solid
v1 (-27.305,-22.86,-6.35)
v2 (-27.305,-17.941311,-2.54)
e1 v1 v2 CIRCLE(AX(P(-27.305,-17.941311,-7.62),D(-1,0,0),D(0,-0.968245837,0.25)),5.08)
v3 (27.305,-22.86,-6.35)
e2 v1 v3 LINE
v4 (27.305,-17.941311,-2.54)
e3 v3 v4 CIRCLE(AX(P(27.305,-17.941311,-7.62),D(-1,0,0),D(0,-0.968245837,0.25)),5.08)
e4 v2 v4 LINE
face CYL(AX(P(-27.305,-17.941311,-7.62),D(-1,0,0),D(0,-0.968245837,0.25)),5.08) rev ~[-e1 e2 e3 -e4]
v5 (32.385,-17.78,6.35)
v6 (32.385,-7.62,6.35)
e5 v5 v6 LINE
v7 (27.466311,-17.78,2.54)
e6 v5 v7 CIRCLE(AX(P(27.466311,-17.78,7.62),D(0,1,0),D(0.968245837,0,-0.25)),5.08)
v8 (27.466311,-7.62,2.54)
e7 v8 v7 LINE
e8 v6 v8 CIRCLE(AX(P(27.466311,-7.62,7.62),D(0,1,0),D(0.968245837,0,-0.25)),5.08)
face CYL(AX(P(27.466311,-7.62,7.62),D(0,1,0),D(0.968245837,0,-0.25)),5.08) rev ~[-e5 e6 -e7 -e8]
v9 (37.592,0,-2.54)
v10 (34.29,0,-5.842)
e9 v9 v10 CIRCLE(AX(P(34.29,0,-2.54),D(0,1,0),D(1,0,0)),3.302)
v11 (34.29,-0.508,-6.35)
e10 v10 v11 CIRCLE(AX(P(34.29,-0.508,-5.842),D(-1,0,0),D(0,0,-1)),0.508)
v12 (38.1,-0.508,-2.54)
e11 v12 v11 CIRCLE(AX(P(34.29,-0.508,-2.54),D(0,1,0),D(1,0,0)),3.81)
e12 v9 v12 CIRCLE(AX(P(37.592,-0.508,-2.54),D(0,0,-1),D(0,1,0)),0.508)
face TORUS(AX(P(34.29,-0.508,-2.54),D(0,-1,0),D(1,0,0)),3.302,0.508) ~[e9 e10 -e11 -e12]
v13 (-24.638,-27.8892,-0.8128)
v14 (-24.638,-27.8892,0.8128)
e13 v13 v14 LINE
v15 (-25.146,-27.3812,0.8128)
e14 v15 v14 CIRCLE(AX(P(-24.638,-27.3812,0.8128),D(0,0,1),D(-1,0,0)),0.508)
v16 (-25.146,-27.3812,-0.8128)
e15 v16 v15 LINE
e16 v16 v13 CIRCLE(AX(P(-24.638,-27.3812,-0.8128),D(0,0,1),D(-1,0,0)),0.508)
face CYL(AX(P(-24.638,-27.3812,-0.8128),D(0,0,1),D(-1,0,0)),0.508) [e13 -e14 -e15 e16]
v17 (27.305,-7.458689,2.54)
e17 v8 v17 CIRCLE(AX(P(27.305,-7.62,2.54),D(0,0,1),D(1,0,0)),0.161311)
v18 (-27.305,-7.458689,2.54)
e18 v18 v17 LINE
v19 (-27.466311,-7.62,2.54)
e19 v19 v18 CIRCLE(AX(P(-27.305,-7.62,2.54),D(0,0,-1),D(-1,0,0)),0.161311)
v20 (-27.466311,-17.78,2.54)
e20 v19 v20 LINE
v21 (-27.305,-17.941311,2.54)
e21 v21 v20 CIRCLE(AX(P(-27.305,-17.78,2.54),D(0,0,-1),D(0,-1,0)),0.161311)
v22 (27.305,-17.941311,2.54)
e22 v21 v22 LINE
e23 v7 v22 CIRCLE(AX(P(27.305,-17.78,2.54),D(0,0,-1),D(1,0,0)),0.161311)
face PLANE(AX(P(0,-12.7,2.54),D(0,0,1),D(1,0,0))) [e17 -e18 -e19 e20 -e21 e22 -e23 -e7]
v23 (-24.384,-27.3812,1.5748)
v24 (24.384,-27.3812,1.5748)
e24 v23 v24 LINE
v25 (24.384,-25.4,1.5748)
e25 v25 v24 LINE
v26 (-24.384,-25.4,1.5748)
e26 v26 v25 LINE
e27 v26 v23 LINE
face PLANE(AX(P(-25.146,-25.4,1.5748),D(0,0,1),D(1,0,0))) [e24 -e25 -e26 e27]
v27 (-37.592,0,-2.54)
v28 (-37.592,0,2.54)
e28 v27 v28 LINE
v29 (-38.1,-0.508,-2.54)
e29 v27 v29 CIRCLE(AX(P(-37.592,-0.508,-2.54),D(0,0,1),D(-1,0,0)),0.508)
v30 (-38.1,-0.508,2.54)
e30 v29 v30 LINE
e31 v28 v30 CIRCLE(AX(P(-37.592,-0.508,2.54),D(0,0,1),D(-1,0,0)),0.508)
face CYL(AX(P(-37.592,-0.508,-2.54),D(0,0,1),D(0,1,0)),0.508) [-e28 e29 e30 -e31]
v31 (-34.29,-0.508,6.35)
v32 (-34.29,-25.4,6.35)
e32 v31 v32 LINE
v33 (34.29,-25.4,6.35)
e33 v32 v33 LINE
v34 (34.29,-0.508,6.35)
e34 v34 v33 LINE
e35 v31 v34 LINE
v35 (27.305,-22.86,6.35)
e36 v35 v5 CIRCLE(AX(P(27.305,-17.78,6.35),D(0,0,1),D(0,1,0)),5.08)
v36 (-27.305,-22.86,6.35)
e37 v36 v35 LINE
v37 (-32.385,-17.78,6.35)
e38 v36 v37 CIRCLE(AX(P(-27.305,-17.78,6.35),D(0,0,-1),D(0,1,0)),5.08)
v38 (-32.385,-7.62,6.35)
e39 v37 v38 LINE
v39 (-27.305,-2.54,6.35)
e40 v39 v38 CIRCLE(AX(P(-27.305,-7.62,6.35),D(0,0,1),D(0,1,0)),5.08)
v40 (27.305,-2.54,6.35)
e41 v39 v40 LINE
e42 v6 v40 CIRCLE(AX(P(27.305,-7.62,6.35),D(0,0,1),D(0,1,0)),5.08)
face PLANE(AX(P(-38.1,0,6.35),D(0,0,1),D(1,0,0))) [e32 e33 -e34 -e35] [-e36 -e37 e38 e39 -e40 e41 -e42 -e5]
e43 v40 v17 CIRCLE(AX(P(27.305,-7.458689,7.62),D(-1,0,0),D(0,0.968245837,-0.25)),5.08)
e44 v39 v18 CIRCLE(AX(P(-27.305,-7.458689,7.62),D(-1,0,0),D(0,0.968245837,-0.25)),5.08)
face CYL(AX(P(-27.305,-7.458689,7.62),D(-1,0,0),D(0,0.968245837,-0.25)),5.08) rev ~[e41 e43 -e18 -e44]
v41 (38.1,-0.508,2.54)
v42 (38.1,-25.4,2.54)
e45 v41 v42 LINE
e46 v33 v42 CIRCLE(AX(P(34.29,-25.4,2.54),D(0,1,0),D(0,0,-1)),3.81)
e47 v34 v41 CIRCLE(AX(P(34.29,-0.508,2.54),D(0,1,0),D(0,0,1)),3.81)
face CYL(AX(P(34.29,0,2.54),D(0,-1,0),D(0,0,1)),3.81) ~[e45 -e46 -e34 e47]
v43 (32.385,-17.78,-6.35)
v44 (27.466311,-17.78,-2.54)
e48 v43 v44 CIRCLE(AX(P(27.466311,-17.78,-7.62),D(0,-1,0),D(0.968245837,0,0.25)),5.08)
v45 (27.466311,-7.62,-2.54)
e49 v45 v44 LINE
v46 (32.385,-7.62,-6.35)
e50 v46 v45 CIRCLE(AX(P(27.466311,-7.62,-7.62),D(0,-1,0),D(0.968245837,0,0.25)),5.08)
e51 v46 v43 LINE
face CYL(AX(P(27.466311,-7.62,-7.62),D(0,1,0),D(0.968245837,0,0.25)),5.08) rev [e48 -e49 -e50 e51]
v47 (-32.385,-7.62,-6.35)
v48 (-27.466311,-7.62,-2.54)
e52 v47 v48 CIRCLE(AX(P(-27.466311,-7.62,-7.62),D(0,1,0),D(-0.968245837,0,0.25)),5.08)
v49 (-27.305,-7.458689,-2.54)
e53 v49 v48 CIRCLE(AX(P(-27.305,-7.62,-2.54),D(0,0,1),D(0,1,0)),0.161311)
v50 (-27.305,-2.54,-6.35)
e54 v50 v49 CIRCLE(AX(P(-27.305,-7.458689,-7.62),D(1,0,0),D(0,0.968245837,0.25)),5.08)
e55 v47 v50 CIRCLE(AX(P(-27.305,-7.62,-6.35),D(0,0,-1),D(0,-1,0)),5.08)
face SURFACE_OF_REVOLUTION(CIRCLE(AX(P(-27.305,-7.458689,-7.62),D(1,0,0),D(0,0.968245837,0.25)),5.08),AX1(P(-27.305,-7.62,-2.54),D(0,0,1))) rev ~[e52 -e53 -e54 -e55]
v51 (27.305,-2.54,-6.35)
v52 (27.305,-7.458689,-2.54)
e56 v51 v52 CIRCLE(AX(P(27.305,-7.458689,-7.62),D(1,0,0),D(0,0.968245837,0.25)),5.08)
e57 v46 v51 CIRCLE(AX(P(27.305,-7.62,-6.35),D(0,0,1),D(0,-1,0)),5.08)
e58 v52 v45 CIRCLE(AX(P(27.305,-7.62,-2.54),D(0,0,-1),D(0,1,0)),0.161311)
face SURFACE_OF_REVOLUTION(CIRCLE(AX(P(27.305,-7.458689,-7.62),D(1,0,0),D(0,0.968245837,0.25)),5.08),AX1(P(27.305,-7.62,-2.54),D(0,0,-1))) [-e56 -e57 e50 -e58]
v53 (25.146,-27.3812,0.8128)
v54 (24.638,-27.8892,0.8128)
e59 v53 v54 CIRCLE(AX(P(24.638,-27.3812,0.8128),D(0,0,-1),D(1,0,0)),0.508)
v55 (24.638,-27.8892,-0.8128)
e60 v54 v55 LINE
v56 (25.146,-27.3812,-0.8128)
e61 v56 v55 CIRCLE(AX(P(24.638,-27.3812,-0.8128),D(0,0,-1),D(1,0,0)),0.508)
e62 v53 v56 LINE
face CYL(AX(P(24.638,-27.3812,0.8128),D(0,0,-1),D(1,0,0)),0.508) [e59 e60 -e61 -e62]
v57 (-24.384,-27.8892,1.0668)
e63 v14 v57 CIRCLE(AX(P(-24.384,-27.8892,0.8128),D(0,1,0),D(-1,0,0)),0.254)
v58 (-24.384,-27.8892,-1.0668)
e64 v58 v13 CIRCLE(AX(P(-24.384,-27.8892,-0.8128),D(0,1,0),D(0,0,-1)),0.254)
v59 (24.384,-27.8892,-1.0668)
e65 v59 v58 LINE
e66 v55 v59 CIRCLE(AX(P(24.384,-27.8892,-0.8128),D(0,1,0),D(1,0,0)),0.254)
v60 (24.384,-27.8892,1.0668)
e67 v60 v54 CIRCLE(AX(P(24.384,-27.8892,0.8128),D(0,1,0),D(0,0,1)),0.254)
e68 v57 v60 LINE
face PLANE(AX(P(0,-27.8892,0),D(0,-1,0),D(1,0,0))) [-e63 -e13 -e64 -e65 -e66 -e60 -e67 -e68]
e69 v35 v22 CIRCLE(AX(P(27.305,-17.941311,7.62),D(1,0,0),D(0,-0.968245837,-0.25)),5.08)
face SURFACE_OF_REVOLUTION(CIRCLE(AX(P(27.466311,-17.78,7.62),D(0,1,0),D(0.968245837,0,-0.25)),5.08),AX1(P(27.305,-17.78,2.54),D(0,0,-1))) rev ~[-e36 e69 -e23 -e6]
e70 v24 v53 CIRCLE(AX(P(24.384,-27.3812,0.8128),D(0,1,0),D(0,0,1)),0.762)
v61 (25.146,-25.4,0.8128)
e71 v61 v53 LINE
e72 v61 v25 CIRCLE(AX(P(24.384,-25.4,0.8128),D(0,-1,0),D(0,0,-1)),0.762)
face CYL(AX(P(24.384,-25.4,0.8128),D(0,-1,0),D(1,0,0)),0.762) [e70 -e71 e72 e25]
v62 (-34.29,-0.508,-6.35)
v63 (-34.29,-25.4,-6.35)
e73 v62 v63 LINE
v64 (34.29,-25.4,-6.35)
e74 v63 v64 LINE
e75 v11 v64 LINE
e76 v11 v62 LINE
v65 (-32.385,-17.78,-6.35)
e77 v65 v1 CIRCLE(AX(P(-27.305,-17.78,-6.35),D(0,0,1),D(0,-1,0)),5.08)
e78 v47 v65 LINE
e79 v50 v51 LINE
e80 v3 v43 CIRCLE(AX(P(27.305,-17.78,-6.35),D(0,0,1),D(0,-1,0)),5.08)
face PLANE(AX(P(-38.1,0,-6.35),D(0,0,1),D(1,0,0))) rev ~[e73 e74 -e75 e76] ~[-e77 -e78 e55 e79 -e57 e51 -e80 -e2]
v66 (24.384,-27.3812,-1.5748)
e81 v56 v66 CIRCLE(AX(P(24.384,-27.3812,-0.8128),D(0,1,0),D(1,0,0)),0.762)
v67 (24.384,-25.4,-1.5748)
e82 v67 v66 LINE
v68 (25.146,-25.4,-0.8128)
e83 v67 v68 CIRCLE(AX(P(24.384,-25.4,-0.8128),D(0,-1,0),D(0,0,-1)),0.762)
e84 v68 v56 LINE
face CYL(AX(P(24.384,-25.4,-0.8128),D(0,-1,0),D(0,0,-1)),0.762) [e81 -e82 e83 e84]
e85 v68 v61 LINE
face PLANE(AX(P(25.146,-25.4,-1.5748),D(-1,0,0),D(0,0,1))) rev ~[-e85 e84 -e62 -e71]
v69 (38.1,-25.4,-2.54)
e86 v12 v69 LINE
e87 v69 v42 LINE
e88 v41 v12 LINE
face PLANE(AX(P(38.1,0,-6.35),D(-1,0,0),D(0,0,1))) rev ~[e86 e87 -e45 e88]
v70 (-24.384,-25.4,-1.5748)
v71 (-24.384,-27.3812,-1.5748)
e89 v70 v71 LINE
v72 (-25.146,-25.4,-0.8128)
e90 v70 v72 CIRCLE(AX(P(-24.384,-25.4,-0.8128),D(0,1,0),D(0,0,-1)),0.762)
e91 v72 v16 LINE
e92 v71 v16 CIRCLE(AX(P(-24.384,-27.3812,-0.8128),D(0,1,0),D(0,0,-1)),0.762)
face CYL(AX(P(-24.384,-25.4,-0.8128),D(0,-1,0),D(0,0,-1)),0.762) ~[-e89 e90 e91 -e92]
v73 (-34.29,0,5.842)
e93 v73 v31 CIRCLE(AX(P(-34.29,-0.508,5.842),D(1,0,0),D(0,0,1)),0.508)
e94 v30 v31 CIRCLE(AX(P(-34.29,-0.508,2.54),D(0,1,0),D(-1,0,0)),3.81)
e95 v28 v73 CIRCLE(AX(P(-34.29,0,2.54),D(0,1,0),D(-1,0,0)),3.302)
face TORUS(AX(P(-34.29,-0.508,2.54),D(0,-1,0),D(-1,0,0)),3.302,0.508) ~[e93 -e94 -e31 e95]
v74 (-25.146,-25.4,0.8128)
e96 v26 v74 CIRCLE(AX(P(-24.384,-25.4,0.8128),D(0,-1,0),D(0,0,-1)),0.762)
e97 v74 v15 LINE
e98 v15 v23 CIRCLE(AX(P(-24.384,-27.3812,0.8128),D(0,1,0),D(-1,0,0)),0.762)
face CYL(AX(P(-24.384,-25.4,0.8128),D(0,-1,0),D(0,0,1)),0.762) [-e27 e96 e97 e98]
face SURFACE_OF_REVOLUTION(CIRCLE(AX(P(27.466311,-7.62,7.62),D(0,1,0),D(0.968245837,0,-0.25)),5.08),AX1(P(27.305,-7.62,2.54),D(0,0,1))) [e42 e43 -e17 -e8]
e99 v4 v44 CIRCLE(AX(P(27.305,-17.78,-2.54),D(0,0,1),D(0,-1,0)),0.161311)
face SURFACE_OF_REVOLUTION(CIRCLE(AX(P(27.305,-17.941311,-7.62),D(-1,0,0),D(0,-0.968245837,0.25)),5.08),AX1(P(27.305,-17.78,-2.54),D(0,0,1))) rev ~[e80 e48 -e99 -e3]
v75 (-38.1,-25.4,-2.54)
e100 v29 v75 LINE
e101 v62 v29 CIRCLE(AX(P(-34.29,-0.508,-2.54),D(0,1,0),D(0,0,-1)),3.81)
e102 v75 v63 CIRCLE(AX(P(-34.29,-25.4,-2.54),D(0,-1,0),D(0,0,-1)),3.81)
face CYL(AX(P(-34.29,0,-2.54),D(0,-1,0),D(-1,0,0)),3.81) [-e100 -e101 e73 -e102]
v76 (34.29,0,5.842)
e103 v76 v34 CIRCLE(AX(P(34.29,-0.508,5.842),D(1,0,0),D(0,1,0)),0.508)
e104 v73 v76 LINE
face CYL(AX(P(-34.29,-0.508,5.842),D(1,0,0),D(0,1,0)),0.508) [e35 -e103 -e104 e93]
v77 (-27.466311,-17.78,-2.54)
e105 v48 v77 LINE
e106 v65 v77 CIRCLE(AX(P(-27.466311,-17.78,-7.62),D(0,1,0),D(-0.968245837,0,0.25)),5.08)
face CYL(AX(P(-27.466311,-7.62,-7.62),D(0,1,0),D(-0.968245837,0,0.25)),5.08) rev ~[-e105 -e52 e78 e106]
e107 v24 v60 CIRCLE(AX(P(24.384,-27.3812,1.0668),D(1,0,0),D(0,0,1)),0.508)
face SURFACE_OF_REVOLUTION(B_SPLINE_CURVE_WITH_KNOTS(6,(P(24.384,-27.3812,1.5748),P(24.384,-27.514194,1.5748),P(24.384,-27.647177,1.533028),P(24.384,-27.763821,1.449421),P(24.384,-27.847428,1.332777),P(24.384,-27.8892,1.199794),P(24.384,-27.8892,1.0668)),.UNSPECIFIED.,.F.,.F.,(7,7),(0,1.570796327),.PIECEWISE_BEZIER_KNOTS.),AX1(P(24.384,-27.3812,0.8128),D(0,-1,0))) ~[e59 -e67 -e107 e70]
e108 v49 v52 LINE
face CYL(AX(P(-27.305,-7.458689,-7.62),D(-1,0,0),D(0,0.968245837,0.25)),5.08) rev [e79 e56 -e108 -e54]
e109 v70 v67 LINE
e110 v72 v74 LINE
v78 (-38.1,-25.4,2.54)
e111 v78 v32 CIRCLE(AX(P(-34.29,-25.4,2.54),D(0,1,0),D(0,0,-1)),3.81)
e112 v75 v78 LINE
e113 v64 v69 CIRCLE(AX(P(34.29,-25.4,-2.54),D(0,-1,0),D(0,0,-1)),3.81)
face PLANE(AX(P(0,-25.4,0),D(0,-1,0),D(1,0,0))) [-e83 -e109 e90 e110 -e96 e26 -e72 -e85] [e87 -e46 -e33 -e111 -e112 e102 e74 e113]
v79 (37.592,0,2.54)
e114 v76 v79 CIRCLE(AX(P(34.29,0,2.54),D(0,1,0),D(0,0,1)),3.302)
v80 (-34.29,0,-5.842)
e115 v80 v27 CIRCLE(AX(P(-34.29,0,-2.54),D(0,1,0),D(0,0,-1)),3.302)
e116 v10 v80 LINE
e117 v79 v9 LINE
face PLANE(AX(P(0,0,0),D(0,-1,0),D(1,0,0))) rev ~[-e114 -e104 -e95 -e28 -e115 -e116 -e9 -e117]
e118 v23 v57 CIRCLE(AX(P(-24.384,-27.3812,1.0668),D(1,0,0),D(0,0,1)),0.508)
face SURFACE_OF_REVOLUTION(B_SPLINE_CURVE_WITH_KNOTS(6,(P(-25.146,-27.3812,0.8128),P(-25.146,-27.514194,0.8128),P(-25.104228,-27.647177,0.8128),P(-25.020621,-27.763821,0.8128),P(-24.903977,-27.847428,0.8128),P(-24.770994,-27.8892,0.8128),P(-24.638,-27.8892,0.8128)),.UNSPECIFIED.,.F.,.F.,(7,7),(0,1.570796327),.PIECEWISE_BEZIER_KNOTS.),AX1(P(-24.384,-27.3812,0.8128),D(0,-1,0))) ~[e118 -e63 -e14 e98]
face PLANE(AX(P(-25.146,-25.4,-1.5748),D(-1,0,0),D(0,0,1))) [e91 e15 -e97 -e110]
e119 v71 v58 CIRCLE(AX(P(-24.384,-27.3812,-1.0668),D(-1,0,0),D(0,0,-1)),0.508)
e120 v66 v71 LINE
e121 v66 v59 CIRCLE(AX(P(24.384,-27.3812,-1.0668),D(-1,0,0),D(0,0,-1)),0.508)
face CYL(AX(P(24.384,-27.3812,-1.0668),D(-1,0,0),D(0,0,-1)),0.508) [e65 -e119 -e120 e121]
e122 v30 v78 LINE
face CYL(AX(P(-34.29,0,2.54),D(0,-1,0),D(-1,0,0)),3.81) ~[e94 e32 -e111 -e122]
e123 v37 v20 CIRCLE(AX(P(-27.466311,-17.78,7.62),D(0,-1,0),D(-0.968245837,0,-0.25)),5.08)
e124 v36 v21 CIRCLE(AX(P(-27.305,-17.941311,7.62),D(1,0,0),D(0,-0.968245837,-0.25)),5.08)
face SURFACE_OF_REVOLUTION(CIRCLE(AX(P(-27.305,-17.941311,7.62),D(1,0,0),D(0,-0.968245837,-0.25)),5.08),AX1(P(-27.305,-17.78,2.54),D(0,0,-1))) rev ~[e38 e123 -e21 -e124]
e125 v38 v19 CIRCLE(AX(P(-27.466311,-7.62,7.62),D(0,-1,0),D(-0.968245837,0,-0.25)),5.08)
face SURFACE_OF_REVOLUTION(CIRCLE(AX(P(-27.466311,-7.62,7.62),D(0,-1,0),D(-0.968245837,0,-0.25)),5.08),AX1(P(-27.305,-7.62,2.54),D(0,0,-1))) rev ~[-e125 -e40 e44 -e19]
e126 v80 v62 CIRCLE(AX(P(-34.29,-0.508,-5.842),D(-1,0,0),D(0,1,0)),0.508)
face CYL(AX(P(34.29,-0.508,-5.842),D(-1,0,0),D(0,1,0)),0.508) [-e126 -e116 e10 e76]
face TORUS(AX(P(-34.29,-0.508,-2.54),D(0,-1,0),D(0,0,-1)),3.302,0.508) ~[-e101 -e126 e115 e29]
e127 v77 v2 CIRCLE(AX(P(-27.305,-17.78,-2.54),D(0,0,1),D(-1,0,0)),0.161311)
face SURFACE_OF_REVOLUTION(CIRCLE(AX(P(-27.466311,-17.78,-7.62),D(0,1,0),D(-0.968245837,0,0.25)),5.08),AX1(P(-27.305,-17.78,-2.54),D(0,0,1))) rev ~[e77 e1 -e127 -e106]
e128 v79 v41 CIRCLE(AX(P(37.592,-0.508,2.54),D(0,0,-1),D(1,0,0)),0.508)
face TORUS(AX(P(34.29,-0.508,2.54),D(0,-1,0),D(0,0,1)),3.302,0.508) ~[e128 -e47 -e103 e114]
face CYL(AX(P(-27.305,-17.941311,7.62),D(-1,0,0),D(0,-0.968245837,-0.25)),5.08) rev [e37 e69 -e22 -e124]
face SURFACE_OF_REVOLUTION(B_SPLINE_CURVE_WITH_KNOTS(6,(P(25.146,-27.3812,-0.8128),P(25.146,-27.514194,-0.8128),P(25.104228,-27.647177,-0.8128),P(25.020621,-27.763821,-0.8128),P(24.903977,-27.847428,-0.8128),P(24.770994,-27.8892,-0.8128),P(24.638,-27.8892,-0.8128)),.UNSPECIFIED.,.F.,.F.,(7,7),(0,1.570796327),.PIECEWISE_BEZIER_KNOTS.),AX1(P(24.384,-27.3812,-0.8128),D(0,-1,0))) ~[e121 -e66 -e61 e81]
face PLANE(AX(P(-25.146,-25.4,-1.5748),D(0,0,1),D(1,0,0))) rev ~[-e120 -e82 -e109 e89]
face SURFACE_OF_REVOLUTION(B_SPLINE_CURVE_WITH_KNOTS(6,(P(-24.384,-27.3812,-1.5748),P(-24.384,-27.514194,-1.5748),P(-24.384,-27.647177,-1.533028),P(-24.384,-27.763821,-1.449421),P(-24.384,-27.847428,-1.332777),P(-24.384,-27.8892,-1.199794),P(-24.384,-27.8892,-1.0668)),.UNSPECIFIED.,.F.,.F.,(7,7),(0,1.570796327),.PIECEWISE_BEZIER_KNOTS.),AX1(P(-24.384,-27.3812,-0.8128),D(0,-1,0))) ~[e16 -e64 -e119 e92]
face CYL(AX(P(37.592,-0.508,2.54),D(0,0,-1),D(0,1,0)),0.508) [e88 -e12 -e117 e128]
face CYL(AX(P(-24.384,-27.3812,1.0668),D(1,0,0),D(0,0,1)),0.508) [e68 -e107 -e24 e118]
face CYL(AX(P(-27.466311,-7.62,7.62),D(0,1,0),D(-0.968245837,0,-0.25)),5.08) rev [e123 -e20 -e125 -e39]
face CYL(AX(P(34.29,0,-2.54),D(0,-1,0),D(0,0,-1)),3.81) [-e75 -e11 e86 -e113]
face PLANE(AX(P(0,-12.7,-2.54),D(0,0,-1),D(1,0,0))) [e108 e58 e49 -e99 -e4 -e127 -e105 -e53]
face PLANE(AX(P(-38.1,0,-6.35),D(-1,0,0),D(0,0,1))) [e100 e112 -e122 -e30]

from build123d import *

# Parameters (mm, degrees)
F0_W          = 76.2
F0_H          = 12.7
F1_DEPTH      = 25.4
F2_W          = 50.292
F2_H          = 3.1496
F3_DEPTH      = 2.4892
F4_R          = 0.762
F5_R          = 0.508
F6_R          = 3.81
F7_W          = 64.77
F7_H          = 20.32
F8_DEPTH      = 3.81
F9_R          = 5.08
F10_T1_DEPTH  = 54.61
F10_T3_DEPTH  = 10.16
F10_T6_ANGLE  = 90
F10_T8_ANGLE  = 90
F10_T10_ANGLE = 90
F10_T12_ANGLE = 90
F11_W         = 64.77
F11_H         = 20.32
F12_DEPTH     = 3.81
F13_R         = 5.08
F14_T1_DEPTH  = 54.61
F14_T3_DEPTH  = 10.16
F14_T6_ANGLE  = 90
F14_T8_ANGLE  = 90
F14_T10_ANGLE = 90
F14_T12_ANGLE = 90
F15_R         = 0.508


# Not quite as in the source:
# - a fillet or chamfer that OpenCascade refuses, or shapes differently, is made with other operations: its cross-section is extruded or revolved along the edge and cut away or added


with BuildPart() as f1:
    # F0 (on Front) → F1 (new body)
    with BuildSketch(Plane.XZ):
        Rectangle(F0_W, F0_H)
    extrude(amount=F1_DEPTH)

    # F2 (on face) → F3 (join)
    with BuildSketch(Plane.XZ.offset(25.4)):
        Rectangle(F2_W, F2_H)
    extrude(amount=F3_DEPTH)

    # F4
    f4_edges = [f1.edges().sort_by_distance(p)[0] for p in [
        (-25.146, -26.6446, 1.5748),
        (-25.146, -26.6446, -1.5748),
        (25.146, -26.6446, 1.5748),
        (25.146, -26.6446, -1.5748),
    ]]
    fillet(f4_edges, radius=F4_R)

    # F5
    f5_edges = [f1.edges().sort_by_distance(p)[0] for p in [
        (0, -27.8892, 1.5748),
        (24.922815, -27.8892, 1.351615),
        (-24.922815, -27.8892, 1.351615),
        (25.146, -27.8892, 0),
        (-25.146, -27.8892, 0),
        (24.922815, -27.8892, -1.351615),
        (-24.922815, -27.8892, -1.351615),
        (0, -27.8892, -1.5748),
    ]]
    fillet(f5_edges, radius=F5_R)

    # F6
    f6_edges = [f1.edges().sort_by_distance(p)[0] for p in [
        (38.1, -12.7, 6.35),
        (38.1, -12.7, -6.35),
        (-38.1, -12.7, 6.35),
        (-38.1, -12.7, -6.35),
    ]]
    fillet(f6_edges, radius=F6_R)

    # F7 (on face) → F8 (cut)
    with BuildSketch(Plane.XY.offset(6.35)):
        with Locations((0, -12.7)):
            Rectangle(F7_W, F7_H)
    extrude(amount=-F8_DEPTH, mode=Mode.SUBTRACT)

    # F9
    f9_edges = [f1.edges().sort_by_distance(p)[0] for p in [
        (-32.385, -2.54, 4.445),
        (-32.385, -22.86, 4.445),
        (32.385, -2.54, 4.445),
        (32.385, -22.86, 4.445),
    ]]
    fillet(f9_edges, radius=F9_R)

    # F10: fillet of radius 5.08 on 1 edges, made by hand

    # F10_s2 → F10_t1 (join)
    with BuildSketch(Plane.YZ.offset(-27.305)):
        with BuildLine():
            ThreePointArc((-2.54, 6.35), (-4.3478368763, 3.6039073716), (-7.4586888497, 2.54))
            Line((-7.4586888497, 2.54), (-2.54, 2.54))
            Line((-2.54, 2.54), (-2.54, 6.35))
        make_face()
        with BuildLine():
            ThreePointArc((-22.86, 6.35), (-21.0521631237, 3.6039073716), (-17.9413111503, 2.54))
            Line((-17.9413111503, 2.54), (-22.86, 2.54))
            Line((-22.86, 2.54), (-22.86, 6.35))
        make_face()
    extrude(amount=F10_T1_DEPTH)

    # F10_s4 → F10_t3 (join)
    with BuildSketch(Plane.XZ.offset(7.62)):
        with BuildLine():
            ThreePointArc((-32.385, 6.35), (-30.5771631237, 3.6039073716), (-27.4663111503, 2.54))
            Line((-27.4663111503, 2.54), (-32.385, 2.54))
            Line((-32.385, 2.54), (-32.385, 6.35))
        make_face()
        with BuildLine():
            ThreePointArc((32.385, 6.35), (30.5771631237, 3.6039073716), (27.4663111503, 2.54))
            Line((27.4663111503, 2.54), (32.385, 2.54))
            Line((32.385, 2.54), (32.385, 6.35))
        make_face()
    extrude(amount=F10_T3_DEPTH)

    # F10_s5 → F10_t6 (revolve)
    with BuildSketch(Plane.XZ.offset(7.62)):
        with BuildLine():
            ThreePointArc((32.385, 6.35), (30.5771631237, 3.6039073716), (27.4663111503, 2.54))
            Line((27.4663111503, 2.54), (32.385, 2.54))
            Line((32.385, 2.54), (32.385, 6.35))
        make_face()
    revolve(axis=Axis((27.305, -7.62, 2.54), (0, 0, 1)), revolution_arc=F10_T6_ANGLE)

    # F10_s7 → F10_t8 (revolve)
    with BuildSketch(Plane.XZ.offset(7.62)):
        with BuildLine():
            ThreePointArc((-32.385, 6.35), (-30.5771631237, 3.6039073716), (-27.4663111503, 2.54))
            Line((-27.4663111503, 2.54), (-32.385, 2.54))
            Line((-32.385, 2.54), (-32.385, 6.35))
        make_face()
    revolve(axis=Axis((-27.305, -7.62, 2.54), (0, 0, -1)), revolution_arc=F10_T8_ANGLE)

    # F10_s9 → F10_t10 (revolve)
    with BuildSketch(Plane.YZ.offset(-27.305)):
        with BuildLine():
            ThreePointArc((-22.86, 6.35), (-21.0521631237, 3.6039073716), (-17.9413111503, 2.54))
            Line((-17.9413111503, 2.54), (-22.86, 2.54))
            Line((-22.86, 2.54), (-22.86, 6.35))
        make_face()
    revolve(axis=Axis((-27.305, -17.78, 2.54), (0, 0, -1)), revolution_arc=F10_T10_ANGLE)

    # F10_s11 → F10_t12 (revolve)
    with BuildSketch(Plane.XZ.offset(17.78)):
        with BuildLine():
            ThreePointArc((32.385, 6.35), (30.5771631237, 3.6039073716), (27.4663111503, 2.54))
            Line((27.4663111503, 2.54), (32.385, 2.54))
            Line((32.385, 2.54), (32.385, 6.35))
        make_face()
    revolve(axis=Axis((27.305, -17.78, 2.54), (0, 0, -1)), revolution_arc=F10_T12_ANGLE)

    # F11 (on face) → F12 (cut)
    with BuildSketch(Plane(origin=(0, 0, -6.35), x_dir=(1, 0, 0), z_dir=(0, 0, -1))):
        with Locations((0, 12.7)):
            Rectangle(F11_W, F11_H)
    extrude(amount=-F12_DEPTH, mode=Mode.SUBTRACT)

    # F13
    f13_edges = [f1.edges().sort_by_distance(p)[0] for p in [
        (32.385, -22.86, -4.445),
        (32.385, -2.54, -4.445),
        (-32.385, -22.86, -4.445),
        (-32.385, -2.54, -4.445),
    ]]
    fillet(f13_edges, radius=F13_R)

    # F14: fillet of radius 5.08 on 1 edges, made by hand

    # F14_s2 → F14_t1 (join)
    with BuildSketch(Plane.YZ.offset(-27.305)):
        with BuildLine():
            ThreePointArc((-22.86, -6.35), (-21.0521631237, -3.6039073716), (-17.9413111503, -2.54))
            Line((-17.9413111503, -2.54), (-22.86, -2.54))
            Line((-22.86, -2.54), (-22.86, -6.35))
        make_face()
        with BuildLine():
            ThreePointArc((-2.54, -6.35), (-4.3478368763, -3.6039073716), (-7.4586888497, -2.54))
            Line((-7.4586888497, -2.54), (-2.54, -2.54))
            Line((-2.54, -2.54), (-2.54, -6.35))
        make_face()
    extrude(amount=F14_T1_DEPTH)

    # F14_s4 → F14_t3 (join)
    with BuildSketch(Plane.XZ.offset(7.62)):
        with BuildLine():
            ThreePointArc((32.385, -6.35), (30.5771631237, -3.6039073716), (27.4663111503, -2.54))
            Line((27.4663111503, -2.54), (32.385, -2.54))
            Line((32.385, -2.54), (32.385, -6.35))
        make_face()
        with BuildLine():
            ThreePointArc((-32.385, -6.35), (-30.5771631237, -3.6039073716), (-27.4663111503, -2.54))
            Line((-27.4663111503, -2.54), (-32.385, -2.54))
            Line((-32.385, -2.54), (-32.385, -6.35))
        make_face()
    extrude(amount=F14_T3_DEPTH)

    # F14_s5 → F14_t6 (revolve)
    with BuildSketch(Plane.YZ.offset(27.305)):
        with BuildLine():
            ThreePointArc((-22.86, -6.35), (-21.0521631237, -3.6039073716), (-17.9413111503, -2.54))
            Line((-17.9413111503, -2.54), (-22.86, -2.54))
            Line((-22.86, -2.54), (-22.86, -6.35))
        make_face()
    revolve(axis=Axis((27.305, -17.78, -2.54), (0, 0, 1)), revolution_arc=F14_T6_ANGLE)

    # F14_s7 → F14_t8 (revolve)
    with BuildSketch(Plane.YZ.offset(27.305)):
        with BuildLine():
            ThreePointArc((-2.54, -6.35), (-4.3478368763, -3.6039073716), (-7.4586888497, -2.54))
            Line((-7.4586888497, -2.54), (-2.54, -2.54))
            Line((-2.54, -2.54), (-2.54, -6.35))
        make_face()
    revolve(axis=Axis((27.305, -7.62, -2.54), (0, 0, -1)), revolution_arc=F14_T8_ANGLE)

    # F14_s9 → F14_t10 (revolve)
    with BuildSketch(Plane.YZ.offset(-27.305)):
        with BuildLine():
            ThreePointArc((-2.54, -6.35), (-4.3478368763, -3.6039073716), (-7.4586888497, -2.54))
            Line((-7.4586888497, -2.54), (-2.54, -2.54))
            Line((-2.54, -2.54), (-2.54, -6.35))
        make_face()
    revolve(axis=Axis((-27.305, -7.62, -2.54), (0, 0, 1)), revolution_arc=F14_T10_ANGLE)

    # F14_s11 → F14_t12 (revolve)
    with BuildSketch(Plane.XZ.offset(17.78)):
        with BuildLine():
            ThreePointArc((-32.385, -6.35), (-30.5771631237, -3.6039073716), (-27.4663111503, -2.54))
            Line((-27.4663111503, -2.54), (-32.385, -2.54))
            Line((-32.385, -2.54), (-32.385, -6.35))
        make_face()
    revolve(axis=Axis((-27.305, -17.78, -2.54), (0, 0, 1)), revolution_arc=F14_T12_ANGLE)

    # F15
    f15_edges = [f1.edges().sort_by_distance(p)[0] for p in [
        (-36.984077, 0, 5.234077),
        (0, 0, -6.35),
        (0, 0, 6.35),
        (36.984077, 0, 5.234077),
        (38.1, 0, 0),
        (-38.1, 0, 0),
        (36.984077, 0, -5.234077),
        (-36.984077, 0, -5.234077),
    ]]
    fillet(f15_edges, radius=F15_R)


solid = f1.part
